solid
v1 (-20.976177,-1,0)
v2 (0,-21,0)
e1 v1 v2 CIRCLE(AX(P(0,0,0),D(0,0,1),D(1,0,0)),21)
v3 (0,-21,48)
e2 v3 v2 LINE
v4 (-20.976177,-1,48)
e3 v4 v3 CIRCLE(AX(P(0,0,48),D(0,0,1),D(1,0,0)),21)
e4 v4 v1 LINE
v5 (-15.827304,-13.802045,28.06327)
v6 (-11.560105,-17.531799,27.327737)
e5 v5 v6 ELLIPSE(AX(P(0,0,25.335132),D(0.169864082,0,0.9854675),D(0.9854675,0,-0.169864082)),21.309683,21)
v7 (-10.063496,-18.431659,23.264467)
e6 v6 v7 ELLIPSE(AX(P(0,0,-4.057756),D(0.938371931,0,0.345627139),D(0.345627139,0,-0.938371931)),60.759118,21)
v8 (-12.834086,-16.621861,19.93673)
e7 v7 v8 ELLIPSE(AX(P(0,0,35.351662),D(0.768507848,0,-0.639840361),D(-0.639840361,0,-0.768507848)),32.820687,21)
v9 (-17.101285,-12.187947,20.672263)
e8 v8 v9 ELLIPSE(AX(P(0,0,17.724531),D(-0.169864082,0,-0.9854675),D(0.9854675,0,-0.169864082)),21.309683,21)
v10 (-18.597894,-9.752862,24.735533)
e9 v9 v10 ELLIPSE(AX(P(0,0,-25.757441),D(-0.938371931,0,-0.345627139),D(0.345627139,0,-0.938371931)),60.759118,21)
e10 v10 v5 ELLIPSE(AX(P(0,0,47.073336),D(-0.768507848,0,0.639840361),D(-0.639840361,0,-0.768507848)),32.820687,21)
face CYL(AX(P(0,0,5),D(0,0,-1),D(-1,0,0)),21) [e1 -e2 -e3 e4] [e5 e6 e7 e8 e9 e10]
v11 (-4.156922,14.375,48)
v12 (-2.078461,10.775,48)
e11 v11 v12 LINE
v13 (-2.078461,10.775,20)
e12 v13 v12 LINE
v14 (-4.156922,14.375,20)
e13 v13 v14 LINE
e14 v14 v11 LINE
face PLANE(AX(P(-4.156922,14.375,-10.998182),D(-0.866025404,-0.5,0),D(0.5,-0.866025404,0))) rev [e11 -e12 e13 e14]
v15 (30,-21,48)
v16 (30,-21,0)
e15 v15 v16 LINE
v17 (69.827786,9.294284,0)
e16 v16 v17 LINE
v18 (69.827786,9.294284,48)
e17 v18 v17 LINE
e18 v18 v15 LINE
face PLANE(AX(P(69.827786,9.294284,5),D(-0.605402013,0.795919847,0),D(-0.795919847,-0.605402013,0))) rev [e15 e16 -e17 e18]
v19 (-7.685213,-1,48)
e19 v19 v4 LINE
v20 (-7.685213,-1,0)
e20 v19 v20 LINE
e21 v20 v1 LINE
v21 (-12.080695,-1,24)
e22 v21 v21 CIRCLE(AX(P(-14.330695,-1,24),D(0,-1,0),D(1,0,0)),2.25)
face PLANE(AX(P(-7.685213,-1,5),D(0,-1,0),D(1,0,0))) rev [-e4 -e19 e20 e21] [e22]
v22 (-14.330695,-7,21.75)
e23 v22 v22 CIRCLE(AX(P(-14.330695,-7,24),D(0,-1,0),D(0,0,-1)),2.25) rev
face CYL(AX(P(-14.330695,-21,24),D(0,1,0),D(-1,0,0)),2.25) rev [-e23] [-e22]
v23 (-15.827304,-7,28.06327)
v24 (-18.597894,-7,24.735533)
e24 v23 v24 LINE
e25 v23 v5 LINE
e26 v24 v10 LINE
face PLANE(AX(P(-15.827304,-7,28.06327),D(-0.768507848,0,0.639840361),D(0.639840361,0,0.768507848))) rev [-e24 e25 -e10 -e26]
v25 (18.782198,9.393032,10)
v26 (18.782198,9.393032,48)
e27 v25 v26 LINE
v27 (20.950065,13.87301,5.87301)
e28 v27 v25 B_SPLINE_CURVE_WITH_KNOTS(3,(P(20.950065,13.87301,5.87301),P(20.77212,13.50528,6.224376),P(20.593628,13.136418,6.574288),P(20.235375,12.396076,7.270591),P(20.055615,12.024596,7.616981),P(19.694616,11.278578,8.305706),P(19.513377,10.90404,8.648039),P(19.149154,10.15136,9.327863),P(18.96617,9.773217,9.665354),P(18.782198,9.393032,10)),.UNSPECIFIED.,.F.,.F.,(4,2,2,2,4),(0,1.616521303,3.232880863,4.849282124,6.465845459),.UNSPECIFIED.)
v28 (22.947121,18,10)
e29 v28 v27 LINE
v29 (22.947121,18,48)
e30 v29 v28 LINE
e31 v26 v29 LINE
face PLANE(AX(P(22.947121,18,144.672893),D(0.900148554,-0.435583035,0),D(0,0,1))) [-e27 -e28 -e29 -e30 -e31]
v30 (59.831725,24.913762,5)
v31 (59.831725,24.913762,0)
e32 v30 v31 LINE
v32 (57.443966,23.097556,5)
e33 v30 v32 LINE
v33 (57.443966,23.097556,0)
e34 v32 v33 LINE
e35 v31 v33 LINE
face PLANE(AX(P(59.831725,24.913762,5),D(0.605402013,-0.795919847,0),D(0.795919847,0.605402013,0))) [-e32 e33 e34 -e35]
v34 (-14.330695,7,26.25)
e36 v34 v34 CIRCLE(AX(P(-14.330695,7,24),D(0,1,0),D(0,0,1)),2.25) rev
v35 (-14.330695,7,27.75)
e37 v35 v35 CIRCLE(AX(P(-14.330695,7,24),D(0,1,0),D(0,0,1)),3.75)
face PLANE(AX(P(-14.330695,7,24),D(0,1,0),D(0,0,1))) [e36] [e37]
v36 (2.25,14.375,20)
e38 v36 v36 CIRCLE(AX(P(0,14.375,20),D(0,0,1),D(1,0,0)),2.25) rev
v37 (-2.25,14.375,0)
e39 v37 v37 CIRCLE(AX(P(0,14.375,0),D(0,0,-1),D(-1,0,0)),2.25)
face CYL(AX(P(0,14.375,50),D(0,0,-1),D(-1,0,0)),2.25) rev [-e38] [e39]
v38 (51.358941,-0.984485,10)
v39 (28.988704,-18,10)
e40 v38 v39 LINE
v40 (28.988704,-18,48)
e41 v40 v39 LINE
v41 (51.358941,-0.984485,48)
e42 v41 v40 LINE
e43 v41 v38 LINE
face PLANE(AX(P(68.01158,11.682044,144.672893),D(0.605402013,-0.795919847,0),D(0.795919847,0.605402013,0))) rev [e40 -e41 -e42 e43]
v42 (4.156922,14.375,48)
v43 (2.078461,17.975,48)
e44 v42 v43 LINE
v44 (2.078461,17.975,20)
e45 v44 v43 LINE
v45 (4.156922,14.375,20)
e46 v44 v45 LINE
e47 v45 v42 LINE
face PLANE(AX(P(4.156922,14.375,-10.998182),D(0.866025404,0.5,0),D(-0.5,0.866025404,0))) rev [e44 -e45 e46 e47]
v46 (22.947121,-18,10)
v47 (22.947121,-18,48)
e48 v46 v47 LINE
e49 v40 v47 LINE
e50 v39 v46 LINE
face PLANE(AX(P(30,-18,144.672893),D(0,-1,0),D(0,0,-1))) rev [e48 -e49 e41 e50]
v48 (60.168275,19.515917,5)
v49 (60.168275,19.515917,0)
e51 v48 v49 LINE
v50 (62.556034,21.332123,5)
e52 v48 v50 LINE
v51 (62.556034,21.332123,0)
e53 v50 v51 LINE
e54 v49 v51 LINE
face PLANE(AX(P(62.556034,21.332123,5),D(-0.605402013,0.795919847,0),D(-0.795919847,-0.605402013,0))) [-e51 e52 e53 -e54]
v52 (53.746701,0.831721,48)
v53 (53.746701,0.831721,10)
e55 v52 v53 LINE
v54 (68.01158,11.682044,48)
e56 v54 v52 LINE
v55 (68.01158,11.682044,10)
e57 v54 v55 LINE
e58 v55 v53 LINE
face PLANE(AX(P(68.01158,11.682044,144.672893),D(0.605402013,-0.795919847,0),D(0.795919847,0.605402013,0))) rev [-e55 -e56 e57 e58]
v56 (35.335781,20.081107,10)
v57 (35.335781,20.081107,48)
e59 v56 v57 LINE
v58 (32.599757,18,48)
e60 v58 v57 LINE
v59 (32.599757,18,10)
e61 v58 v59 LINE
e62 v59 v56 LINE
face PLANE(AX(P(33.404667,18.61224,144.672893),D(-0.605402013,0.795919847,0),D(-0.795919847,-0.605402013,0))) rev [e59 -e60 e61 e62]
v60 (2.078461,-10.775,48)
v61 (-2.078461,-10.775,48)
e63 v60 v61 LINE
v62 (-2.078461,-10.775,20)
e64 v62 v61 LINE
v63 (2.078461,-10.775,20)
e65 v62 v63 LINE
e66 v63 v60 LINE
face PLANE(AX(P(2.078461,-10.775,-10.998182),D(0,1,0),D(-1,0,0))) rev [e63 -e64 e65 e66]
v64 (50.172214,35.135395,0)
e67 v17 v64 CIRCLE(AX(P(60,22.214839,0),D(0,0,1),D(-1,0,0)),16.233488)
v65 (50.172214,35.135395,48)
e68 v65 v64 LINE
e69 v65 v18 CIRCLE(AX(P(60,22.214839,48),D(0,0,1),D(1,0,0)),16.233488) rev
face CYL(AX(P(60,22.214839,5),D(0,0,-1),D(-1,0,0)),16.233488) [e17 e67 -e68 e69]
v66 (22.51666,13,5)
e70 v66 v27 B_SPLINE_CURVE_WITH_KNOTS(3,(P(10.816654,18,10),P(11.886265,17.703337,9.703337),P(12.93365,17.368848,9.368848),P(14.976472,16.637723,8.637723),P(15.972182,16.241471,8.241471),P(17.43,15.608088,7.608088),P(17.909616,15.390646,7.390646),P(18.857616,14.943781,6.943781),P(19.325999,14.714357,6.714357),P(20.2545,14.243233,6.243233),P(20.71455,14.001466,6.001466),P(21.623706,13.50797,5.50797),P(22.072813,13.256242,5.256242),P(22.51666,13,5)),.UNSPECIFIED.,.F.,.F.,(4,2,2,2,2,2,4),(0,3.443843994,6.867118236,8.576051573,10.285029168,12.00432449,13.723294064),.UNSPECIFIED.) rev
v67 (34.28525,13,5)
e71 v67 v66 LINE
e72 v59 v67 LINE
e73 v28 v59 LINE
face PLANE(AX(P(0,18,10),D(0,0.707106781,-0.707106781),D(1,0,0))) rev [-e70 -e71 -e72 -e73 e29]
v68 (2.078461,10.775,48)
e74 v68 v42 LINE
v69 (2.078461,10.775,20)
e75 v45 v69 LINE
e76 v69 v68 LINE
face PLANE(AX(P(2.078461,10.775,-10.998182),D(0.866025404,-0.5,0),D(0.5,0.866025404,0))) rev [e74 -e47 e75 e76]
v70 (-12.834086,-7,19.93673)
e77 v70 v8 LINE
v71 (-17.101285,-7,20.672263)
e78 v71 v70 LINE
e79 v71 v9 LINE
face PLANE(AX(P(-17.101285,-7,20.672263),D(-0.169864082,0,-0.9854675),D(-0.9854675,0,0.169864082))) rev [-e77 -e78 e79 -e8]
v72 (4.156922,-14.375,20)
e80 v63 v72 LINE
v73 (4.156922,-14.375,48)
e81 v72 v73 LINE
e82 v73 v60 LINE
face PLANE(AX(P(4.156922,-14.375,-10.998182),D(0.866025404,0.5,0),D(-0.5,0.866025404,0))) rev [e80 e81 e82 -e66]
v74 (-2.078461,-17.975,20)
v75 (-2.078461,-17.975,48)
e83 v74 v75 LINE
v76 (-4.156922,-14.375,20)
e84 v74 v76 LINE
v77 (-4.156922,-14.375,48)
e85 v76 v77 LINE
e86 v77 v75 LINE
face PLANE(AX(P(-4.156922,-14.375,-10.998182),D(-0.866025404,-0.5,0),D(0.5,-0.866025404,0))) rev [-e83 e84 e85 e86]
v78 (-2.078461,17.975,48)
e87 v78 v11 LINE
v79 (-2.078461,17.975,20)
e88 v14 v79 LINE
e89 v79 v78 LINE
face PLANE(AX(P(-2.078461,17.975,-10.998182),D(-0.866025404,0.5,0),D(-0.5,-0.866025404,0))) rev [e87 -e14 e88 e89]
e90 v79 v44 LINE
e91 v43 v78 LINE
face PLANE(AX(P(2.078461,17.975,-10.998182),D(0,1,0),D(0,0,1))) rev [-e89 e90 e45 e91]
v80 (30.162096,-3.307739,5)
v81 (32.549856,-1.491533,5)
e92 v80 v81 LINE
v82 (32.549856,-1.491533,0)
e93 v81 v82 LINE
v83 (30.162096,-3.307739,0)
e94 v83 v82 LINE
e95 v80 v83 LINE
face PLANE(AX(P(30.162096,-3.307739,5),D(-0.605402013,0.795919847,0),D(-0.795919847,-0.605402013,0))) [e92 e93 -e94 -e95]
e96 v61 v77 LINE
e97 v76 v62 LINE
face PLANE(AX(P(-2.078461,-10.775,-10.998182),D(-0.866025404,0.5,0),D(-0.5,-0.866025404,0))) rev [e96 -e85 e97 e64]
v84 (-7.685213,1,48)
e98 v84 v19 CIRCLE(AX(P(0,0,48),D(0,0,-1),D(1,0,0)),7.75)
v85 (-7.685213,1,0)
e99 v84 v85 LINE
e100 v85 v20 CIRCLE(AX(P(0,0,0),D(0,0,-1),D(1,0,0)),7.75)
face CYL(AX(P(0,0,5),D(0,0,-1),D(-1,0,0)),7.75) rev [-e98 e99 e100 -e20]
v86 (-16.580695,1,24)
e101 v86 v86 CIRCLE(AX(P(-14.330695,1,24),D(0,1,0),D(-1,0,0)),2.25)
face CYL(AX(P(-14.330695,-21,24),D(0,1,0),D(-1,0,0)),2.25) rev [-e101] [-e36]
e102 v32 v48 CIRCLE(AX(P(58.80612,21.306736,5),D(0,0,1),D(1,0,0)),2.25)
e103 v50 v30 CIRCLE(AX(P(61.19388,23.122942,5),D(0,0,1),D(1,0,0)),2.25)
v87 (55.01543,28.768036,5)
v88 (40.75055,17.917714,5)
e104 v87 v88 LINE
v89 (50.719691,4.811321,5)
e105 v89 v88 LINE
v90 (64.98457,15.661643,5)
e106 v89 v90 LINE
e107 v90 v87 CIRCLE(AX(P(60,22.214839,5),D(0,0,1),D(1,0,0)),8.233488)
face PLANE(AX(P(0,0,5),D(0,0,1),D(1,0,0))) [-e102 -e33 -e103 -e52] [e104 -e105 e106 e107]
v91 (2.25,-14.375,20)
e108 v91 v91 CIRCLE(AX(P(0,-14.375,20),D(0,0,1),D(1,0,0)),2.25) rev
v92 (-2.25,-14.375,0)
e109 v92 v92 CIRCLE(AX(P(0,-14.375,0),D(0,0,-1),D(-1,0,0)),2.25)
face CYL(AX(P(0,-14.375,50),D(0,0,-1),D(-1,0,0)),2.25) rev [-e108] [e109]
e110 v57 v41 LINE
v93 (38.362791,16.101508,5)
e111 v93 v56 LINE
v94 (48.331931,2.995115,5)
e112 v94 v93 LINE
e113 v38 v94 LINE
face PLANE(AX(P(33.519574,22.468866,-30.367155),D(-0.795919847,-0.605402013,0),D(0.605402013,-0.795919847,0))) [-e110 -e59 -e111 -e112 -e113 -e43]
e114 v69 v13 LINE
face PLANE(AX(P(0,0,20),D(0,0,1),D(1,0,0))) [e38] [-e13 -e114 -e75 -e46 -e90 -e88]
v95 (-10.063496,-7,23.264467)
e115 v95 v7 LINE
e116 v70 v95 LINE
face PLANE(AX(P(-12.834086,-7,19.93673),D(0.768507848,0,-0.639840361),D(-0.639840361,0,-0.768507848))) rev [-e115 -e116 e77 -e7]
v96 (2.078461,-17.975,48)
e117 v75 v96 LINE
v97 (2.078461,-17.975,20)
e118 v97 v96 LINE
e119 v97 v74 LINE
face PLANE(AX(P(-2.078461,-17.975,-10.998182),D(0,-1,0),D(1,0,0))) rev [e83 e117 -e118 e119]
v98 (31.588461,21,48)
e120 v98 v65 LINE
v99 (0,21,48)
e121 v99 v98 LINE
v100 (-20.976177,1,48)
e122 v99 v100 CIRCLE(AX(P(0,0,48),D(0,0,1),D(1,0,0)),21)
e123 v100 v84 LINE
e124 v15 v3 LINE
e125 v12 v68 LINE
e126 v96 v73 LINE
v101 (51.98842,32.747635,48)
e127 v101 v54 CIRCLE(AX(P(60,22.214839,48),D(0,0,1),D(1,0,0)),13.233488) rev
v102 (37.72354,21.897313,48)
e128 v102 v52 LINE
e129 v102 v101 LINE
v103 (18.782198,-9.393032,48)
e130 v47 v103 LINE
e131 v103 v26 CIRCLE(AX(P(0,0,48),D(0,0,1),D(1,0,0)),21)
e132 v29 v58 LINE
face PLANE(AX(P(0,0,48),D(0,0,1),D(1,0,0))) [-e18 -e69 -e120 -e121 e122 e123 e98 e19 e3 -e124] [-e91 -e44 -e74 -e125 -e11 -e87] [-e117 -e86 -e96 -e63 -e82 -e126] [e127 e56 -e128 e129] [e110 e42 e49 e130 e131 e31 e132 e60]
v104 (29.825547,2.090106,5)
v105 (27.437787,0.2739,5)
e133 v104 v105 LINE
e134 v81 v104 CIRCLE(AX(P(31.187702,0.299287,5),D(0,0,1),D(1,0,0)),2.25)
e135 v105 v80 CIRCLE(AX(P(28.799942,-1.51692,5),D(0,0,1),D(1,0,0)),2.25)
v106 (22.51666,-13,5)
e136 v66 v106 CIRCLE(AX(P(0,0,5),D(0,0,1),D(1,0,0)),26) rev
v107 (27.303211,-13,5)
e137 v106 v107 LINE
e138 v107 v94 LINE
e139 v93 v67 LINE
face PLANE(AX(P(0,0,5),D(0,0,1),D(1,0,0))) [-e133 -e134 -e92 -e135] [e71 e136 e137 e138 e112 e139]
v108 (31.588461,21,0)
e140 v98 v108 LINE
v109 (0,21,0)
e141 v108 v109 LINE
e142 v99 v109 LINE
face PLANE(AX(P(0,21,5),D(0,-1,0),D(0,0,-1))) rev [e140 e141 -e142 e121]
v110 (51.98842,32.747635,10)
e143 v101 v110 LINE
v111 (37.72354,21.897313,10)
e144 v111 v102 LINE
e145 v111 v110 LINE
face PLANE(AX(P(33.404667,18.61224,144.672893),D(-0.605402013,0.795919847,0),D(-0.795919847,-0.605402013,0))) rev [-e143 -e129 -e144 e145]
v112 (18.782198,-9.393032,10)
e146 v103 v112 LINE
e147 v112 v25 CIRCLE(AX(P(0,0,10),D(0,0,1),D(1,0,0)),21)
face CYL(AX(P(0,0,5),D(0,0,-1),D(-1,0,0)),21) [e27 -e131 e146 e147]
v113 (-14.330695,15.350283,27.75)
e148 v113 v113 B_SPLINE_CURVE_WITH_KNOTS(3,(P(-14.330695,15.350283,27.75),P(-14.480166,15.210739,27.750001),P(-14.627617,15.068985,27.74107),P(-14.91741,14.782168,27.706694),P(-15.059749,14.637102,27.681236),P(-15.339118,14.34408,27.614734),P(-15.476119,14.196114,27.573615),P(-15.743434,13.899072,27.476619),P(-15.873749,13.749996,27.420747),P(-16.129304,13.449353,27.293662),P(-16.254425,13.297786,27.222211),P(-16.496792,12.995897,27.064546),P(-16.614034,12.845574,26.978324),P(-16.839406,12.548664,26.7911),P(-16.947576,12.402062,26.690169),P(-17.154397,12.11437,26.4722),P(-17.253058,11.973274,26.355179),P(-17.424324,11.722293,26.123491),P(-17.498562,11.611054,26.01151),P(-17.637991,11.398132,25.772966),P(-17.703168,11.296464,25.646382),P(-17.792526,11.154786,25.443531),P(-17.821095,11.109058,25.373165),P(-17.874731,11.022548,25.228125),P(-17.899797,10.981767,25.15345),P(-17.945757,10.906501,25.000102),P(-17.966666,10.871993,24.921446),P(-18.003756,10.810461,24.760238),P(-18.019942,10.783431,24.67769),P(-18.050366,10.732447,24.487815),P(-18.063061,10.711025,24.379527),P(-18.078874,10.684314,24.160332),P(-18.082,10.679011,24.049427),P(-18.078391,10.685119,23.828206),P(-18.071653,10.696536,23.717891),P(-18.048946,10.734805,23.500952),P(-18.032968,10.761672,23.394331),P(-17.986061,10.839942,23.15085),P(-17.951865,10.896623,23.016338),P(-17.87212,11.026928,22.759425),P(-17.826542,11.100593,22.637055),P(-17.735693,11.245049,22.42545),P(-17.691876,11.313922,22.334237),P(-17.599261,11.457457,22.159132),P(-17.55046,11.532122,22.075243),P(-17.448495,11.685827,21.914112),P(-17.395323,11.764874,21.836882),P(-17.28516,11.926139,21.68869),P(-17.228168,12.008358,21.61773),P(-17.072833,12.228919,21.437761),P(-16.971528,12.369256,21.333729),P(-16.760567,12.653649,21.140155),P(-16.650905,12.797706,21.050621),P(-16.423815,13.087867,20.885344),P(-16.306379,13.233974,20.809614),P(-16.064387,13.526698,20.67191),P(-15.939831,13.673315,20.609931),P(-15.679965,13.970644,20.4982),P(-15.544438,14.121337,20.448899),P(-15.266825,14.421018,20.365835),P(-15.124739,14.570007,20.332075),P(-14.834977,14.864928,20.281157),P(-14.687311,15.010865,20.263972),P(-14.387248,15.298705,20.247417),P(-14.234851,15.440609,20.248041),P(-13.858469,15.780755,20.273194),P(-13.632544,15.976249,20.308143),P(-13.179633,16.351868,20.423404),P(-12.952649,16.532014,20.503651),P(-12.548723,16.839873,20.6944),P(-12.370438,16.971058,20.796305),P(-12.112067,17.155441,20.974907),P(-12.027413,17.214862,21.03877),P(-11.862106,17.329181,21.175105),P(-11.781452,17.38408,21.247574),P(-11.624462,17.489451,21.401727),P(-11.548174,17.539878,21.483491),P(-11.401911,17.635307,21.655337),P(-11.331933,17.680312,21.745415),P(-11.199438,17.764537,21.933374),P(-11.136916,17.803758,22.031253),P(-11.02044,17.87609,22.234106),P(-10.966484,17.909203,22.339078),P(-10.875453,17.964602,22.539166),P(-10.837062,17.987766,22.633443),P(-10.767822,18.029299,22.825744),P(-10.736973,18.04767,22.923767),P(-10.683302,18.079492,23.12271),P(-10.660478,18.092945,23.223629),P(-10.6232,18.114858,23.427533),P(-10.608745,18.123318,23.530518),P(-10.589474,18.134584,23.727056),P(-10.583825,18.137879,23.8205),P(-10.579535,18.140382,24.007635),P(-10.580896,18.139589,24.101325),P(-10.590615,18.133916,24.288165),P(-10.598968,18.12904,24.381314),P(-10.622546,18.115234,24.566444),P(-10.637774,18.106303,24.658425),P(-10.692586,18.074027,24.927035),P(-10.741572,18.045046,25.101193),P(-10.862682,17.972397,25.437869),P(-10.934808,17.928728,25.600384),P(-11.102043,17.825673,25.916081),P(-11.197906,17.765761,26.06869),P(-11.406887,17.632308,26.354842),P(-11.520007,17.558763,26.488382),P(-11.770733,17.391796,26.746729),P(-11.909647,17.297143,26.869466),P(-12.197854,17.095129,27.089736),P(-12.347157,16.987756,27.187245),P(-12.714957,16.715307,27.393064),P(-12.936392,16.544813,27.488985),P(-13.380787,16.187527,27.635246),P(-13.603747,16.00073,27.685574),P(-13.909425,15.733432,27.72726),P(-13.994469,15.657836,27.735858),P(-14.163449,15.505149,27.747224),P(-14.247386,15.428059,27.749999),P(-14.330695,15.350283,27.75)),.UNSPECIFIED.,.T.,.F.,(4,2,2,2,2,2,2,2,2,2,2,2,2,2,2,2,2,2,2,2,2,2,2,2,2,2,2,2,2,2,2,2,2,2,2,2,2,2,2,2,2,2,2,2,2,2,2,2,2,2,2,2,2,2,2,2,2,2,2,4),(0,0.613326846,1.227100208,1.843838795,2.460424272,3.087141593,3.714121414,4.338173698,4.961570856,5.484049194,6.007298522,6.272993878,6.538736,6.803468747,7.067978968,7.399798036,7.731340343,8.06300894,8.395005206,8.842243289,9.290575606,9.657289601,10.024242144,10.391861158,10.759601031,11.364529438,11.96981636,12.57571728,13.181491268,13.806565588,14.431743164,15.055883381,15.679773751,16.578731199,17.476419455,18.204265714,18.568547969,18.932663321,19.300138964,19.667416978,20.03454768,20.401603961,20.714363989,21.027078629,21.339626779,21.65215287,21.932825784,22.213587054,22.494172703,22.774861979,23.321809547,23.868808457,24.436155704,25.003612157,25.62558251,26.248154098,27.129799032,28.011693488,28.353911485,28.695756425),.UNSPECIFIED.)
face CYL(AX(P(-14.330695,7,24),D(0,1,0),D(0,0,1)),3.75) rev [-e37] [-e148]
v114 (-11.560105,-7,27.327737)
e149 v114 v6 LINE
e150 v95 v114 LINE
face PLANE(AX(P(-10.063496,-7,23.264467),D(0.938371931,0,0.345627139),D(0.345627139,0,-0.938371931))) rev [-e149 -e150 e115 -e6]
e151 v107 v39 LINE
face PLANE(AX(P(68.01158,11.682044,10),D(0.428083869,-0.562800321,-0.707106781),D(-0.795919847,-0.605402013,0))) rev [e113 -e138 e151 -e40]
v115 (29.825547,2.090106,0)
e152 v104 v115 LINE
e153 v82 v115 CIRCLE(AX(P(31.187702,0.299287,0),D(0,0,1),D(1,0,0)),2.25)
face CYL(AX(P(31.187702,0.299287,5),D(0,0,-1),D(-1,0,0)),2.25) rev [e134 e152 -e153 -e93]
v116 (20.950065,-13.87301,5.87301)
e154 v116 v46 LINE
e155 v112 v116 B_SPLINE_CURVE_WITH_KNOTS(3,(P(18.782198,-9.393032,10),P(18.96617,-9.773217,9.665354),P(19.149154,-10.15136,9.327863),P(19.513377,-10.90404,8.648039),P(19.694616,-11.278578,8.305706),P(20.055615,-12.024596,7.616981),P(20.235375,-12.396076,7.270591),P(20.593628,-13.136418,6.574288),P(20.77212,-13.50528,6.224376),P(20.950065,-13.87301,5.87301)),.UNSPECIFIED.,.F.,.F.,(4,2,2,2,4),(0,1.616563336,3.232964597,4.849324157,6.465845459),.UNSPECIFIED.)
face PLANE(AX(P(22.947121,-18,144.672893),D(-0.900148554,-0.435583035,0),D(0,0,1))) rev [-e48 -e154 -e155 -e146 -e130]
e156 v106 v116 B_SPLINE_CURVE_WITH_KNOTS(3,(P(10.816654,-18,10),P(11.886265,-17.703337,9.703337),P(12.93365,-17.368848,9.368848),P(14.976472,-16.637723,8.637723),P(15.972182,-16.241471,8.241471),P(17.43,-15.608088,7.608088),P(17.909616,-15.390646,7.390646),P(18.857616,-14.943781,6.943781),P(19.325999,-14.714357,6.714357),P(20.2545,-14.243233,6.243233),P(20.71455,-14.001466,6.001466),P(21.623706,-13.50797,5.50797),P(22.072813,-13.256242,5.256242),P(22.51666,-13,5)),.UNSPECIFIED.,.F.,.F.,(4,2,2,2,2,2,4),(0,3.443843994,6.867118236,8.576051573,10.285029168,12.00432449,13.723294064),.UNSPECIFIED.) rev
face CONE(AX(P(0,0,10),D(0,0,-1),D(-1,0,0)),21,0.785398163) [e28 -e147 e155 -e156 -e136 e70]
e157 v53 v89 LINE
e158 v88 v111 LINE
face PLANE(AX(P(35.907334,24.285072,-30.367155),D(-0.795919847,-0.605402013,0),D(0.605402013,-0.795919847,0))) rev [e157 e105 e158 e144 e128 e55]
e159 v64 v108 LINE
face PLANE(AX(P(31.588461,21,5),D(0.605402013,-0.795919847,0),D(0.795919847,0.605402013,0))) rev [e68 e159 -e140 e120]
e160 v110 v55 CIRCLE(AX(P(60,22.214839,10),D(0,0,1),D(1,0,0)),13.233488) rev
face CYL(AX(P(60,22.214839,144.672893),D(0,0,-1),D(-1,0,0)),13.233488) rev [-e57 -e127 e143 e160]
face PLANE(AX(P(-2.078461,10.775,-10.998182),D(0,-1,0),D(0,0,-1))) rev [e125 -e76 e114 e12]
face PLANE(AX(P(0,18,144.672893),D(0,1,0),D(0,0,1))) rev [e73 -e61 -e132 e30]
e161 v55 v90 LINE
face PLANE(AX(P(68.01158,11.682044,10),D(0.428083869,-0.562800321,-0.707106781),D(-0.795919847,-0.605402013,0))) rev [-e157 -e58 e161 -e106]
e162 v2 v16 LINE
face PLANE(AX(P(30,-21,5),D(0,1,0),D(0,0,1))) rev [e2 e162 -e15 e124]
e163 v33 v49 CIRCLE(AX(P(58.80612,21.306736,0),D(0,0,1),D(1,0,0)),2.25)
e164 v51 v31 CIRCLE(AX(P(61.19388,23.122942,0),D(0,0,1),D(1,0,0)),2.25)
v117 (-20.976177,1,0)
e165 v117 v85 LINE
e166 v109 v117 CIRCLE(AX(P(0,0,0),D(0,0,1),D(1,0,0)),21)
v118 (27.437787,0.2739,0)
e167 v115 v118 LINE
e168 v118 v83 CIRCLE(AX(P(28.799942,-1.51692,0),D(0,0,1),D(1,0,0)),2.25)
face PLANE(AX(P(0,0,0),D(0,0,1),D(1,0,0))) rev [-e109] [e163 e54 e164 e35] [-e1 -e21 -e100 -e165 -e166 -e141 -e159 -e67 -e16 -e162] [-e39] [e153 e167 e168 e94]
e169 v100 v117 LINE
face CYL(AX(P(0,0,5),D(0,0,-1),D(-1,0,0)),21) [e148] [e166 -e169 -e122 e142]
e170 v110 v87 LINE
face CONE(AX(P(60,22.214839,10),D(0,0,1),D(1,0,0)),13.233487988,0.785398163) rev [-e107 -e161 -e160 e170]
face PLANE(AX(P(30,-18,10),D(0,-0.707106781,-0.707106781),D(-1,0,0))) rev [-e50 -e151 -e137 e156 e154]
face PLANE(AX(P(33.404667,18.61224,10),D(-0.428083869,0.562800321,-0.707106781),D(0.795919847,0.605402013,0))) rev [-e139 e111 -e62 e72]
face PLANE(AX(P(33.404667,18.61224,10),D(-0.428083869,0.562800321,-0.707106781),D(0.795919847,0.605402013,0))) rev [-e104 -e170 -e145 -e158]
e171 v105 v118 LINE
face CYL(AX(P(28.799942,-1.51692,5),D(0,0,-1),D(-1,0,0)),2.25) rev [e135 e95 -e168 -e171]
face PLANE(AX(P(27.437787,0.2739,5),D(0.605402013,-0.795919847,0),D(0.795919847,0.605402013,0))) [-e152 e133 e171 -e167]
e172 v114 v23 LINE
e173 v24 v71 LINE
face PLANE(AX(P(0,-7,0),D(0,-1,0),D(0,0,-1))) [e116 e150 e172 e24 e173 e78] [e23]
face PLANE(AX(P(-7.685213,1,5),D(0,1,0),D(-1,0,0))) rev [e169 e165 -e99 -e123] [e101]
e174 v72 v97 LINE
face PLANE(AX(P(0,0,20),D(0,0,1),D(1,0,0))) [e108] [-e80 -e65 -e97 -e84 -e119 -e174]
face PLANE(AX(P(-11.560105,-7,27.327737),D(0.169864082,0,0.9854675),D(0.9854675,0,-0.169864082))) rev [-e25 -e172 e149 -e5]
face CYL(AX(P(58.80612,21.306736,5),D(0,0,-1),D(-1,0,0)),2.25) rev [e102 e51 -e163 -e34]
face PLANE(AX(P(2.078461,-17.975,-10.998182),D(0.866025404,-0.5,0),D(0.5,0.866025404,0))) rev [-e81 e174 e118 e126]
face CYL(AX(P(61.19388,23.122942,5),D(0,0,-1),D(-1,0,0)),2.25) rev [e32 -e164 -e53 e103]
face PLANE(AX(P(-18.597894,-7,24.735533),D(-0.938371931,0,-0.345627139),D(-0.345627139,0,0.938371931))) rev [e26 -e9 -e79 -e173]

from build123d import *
from build123d.topology import SkipClean

# Parameters (mm, degrees)
BOSS_EXTRUDE1_DEPTH     = 5
BOSS_EXTRUDE2_DEPTH     = 43
CUT_EXTRUDE1_DEPTH      = 99.344878968
CUT_EXTRUDE1_DEPTH_BACK = 99.344878968
SKETCH4_R               = 2.25
CUT_EXTRUDE2_DEPTH      = 14
SKETCH6_R               = 3.75
CUT_EXTRUDE3_DEPTH      = 14
SKETCH7_R               = 2.25
CUT_EXTRUDE4_DEPTH      = 50
CUT_EXTRUDE5_DEPTH      = 28
EXTRUDE_THIN1_DEPTH     = 43
CHAMFER1_SIZE           = 5
CHAMFER2_START          = 4.9999999
CHAMFER2_DEPTH          = 43.0000001
CHAMFER3_SIZE           = 10
CHAMFER3_SIZE_2         = 7.855445392
EXTRUDE_THIN2_REACH     = 99.948


with BuildPart() as part:
    # Sketch1 → Boss-Extrude1 (new body)
    with BuildSketch(Plane.XY):
        with BuildLine():
            Line((0, 21), (31.588461174, 21))
            Line((31.588461174, 21), (50.172213659, 35.135394674))
            ThreePointArc((50.172213659, 35.135394674), (72.920555239, 32.042625706), (69.827786272, 9.294284126))
            Line((69.827786272, 9.294284126), (30, -21))
            Line((30, -21), (0, -21))
            ThreePointArc((0, -21), (-14.491376746, -15.198684154), (-20.976176963, -1))
            Line((-20.976176963, -1), (-7.685213074, -1))
            ThreePointArc((-7.685213074, -1), (7.75, 0), (-7.685213074, 1))
            Line((-7.685213074, 1), (-20.976176963, 1))
            ThreePointArc((-20.976176963, 1), (-14.491376746, 15.198684154), (0, 21))
        make_face()
        with BuildLine():
            Line((27.437787439, 0.273900145), (29.82554698, 2.090106184))
            ThreePointArc((29.82554698, 2.090106184), (32.978521164, 1.661441058), (32.549856038, -1.491533127))
            Line((32.549856038, -1.491533127), (30.162096497, -3.307739166))
            ThreePointArc((30.162096497, -3.307739166), (27.009122313, -2.87907404), (27.437787439, 0.273900145))
        make_face(mode=Mode.SUBTRACT)
        with BuildLine():
            Line((62.556034265, 21.332122764), (60.168274724, 19.515916725))
            ThreePointArc((60.168274724, 19.515916725), (57.01530054, 19.944581851), (57.443965666, 23.097556036))
            Line((57.443965666, 23.097556036), (59.831725206, 24.913762075))
            ThreePointArc((59.831725206, 24.913762075), (62.984699391, 24.485096949), (62.556034265, 21.332122764))
        make_face(mode=Mode.SUBTRACT)
    extrude(amount=BOSS_EXTRUDE1_DEPTH)

    # Sketch2 → Boss-Extrude2 (add)
    with SkipClean():  # the faces are left unmerged after this step: merging them gives an invalid solid
        with BuildSketch(Plane.XY.offset(5)):
            with BuildLine():
                Line((-7.685213074, -1), (-20.976176963, -1))
                ThreePointArc((-20.976176963, -1), (-14.491376746, -15.198684154), (0, -21))
                ThreePointArc((0, -21), (21, 0), (0, 21))
                ThreePointArc((0, 21), (-14.491376746, 15.198684154), (-20.976176963, 1))
                Line((-20.976176963, 1), (-7.685213074, 1))
                ThreePointArc((-7.685213074, 1), (7.75, 0), (-7.685213074, -1))
            make_face()
        extrude(amount=BOSS_EXTRUDE2_DEPTH)
    add(part.part.scale(1), mode=Mode.REPLACE)  # the faces are merged on a copy

    # Sketch4 → Cut-Extrude1 (cut, two sides: drawn at the far end of the back side and taken through both)
    with SkipClean():  # the faces are left unmerged after this step: merging them gives an invalid solid
        with BuildSketch(Plane(origin=(0, -1, 0), x_dir=(1, 0, 0), z_dir=(0, 1, 0)).offset(-CUT_EXTRUDE1_DEPTH_BACK)):
            with Locations(Location((-14.330695019, -24, 0), (0, 0, 180))):
                Circle(SKETCH4_R)
        extrude(amount=CUT_EXTRUDE1_DEPTH + CUT_EXTRUDE1_DEPTH_BACK, mode=Mode.SUBTRACT)

    # Sketch5 → Cut-Extrude2 (cut)
    with SkipClean():  # the faces are left unmerged after this step: merging them gives an invalid solid
        with BuildSketch(Plane.XZ.offset(21)):
            Polygon((-12.834085604, 19.936730349), (-10.063495571, 23.264466947), (-11.560104986, 27.327736598), (-15.827304434, 28.063269651), (-18.597894467, 24.735533053), (-17.101285052, 20.672263402), align=None)
        extrude(amount=-CUT_EXTRUDE2_DEPTH, mode=Mode.SUBTRACT)

    # Sketch6 → Cut-Extrude3 (cut)
    with SkipClean():  # the faces are left unmerged after this step: merging them gives an invalid solid
        with BuildSketch(Plane(origin=(0, 21, 0), x_dir=(1, 0, 0), z_dir=(0, 1, 0))):
            with Locations(Location((-14.330695019, -24, 0), (0, 0, 270))):
                Circle(SKETCH6_R)
        extrude(amount=-CUT_EXTRUDE3_DEPTH, mode=Mode.SUBTRACT)

    # Sketch7 → Cut-Extrude4 (cut)
    with SkipClean():  # the faces are left unmerged after this step: merging them gives an invalid solid
        with BuildSketch(Plane(origin=(0, 0, 0), x_dir=(-1, 0, 0), z_dir=(0, 0, -1))):
            with Locations((0, 14.375)):
                Circle(SKETCH7_R)
            with Locations((0, -14.375)):
                Circle(SKETCH7_R)
        extrude(amount=-CUT_EXTRUDE4_DEPTH, mode=Mode.SUBTRACT)

    # Sketch8 → Cut-Extrude5 (cut)
    with SkipClean():  # the faces are left unmerged after this step: merging them gives an invalid solid
        with BuildSketch(Plane.XY.offset(48)):
            Polygon((4.156921938, 14.375), (2.078460969, 17.975), (-2.078460969, 17.975), (-4.156921938, 14.375), (-2.078460969, 10.775), (2.078460969, 10.775), align=None)
            Polygon((4.156921938, -14.375), (2.078460969, -10.775), (-2.078460969, -10.775), (-4.156921938, -14.375), (-2.078460969, -17.975), (2.078460969, -17.975), align=None)
        extrude(amount=-CUT_EXTRUDE5_DEPTH, mode=Mode.SUBTRACT)

    # Sketch9 → Extrude-Thin1 (add)
    with SkipClean():  # the faces are left unmerged after this step: merging them gives an invalid solid
        with BuildSketch(Plane.XY.offset(5)):
            with BuildLine():
                Line((0, 21), (31.588461174, 21))
                Line((31.588461174, 21), (50.172213659, 35.135394674))
                ThreePointArc((50.172213659, 35.135394674), (72.920555239, 32.042625706), (69.827786272, 9.294284126))
                Line((69.827786272, 9.294284126), (30, -21))
                Line((30, -21), (0, -21))
                Line((0, -21), (0, -18))
                Line((0, -18), (28.988704289, -18))
                Line((28.988704289, -18), (68.011580233, 11.682043667))
                ThreePointArc((68.011580233, 11.682043667), (70.532795698, 30.226419667), (51.988419698, 32.747635133))
                Line((51.988419698, 32.747635133), (32.599756885, 18))
                Line((32.599756885, 18), (0, 18))
                Line((0, 18), (0, 21))
            make_face()
        extrude(amount=EXTRUDE_THIN1_DEPTH)

    # Chamfer1
    chamfer1_edges = [part.edges().sort_by_distance(p)[0] for p in [
        (21, 0, 5),
        (19.902679058, -18, 5),
        (21.708205356, 18, 5),
        (42.294088292, 25.373817566, 5),
        (70.532795698, 30.226419667, 5),
        (48.500142261, -3.158978166, 5),
    ]]
    chamfer(chamfer1_edges, length=CHAMFER1_SIZE)

    # Chamfer2: read off the stored shape, not the designer's step
    # Chamfer2 outline → Chamfer2 (add)
    with SkipClean():  # the faces are left unmerged after this step: merging them gives an invalid solid
        with BuildSketch(Plane.XY.offset(CHAMFER2_START)):
            with BuildLine():
                Line((10.816653826, -18), (15.091675551, -18))
                Line((15.091675551, -18), (17.124404275, -12.155442329))
                ThreePointArc((17.124404275, -12.155442329), (14.272890231, -15.404045068), (10.816653826, -18))
            make_face()
            with BuildLine():
                ThreePointArc((10.816653826, 18), (14.272890231, 15.404045068), (17.124404275, 12.155442329))
                Line((17.124404275, 12.155442329), (15.091675551, 18))
                Line((15.091675551, 18), (10.816653826, 18))
            make_face()
        extrude(amount=CHAMFER2_DEPTH)

    # Chamfer3
    # the kernel refuses this chamfer: 10, 7.855445392 mm, written as the material it adds along each edge
    with BuildSketch(Plane(origin=(15.091675551, -18, -15.71682988), x_dir=(0.32849742893027223, 0.9445048645646038, 0), z_dir=(0, 0, 1))) as chamfer3_piece_1_section:
        Polygon((CHAMFER3_SIZE, 0), (CHAMFER3_SIZE_2 * 0.328497428916, -CHAMFER3_SIZE_2 * 0.944504864523), (0, 0), align=None)
    chamfer3_piece_1 = extrude(amount=63.71682988, mode=Mode.PRIVATE)
    chamfer3_piece_1 = split(chamfer3_piece_1, bisect_by=Plane(origin=(15.091675551, -5.14158506, -2.85841494), z_dir=(0, 0.7071067811865476, 0.7071067811865476)), keep=Keep.TOP, mode=Mode.PRIVATE)
    add(chamfer3_piece_1)
    with BuildSketch(Plane(origin=(15.091675551, 18, -15.71682988), x_dir=(0.32849742893027223, -0.9445048645646039, 0), z_dir=(0, 0, 1))) as chamfer3_piece_2_section:
        Polygon((CHAMFER3_SIZE, 0), (CHAMFER3_SIZE_2 * 0.328497428916, CHAMFER3_SIZE_2 * 0.944504864523), (0, 0), align=None)
    chamfer3_piece_2 = extrude(amount=63.71682988, mode=Mode.PRIVATE)
    chamfer3_piece_2 = split(chamfer3_piece_2, bisect_by=Plane(origin=(15.091675551, 5.14158506, -2.85841494), z_dir=(0, -0.7071067811865476, 0.7071067811865476)), keep=Keep.TOP, mode=Mode.PRIVATE)
    add(chamfer3_piece_2)

    # Extrude-Thin2: up to this face of the body (flat: up to its plane)
    extrude_thin2_end = Plane(part.part.faces().sort_by_distance((44.470080552, 10.533508587, 5))[0])
    # Sketch10 → Extrude-Thin2 (add, up to the picked face)
    with BuildSketch(Plane.XY.offset(48), mode=Mode.PRIVATE) as extrude_thin2_sk1:
        Polygon((33.519574493, 22.468866363), (53.175147106, -3.372244184), (55.562906646, -1.556038145), (35.907334034, 24.285072402), align=None)
    extrude_thin2_tool1 = split(extrude(extrude_thin2_sk1.sketch, amount=-EXTRUDE_THIN2_REACH, mode=Mode.PRIVATE), bisect_by=extrude_thin2_end, keep=Keep.BOTH, mode=Mode.PRIVATE)
    add(extrude_thin2_tool1.solids().sort_by(Axis((44.541241, 10.456414, 48), (0, 0, -1)))[0])


solid = part.part
